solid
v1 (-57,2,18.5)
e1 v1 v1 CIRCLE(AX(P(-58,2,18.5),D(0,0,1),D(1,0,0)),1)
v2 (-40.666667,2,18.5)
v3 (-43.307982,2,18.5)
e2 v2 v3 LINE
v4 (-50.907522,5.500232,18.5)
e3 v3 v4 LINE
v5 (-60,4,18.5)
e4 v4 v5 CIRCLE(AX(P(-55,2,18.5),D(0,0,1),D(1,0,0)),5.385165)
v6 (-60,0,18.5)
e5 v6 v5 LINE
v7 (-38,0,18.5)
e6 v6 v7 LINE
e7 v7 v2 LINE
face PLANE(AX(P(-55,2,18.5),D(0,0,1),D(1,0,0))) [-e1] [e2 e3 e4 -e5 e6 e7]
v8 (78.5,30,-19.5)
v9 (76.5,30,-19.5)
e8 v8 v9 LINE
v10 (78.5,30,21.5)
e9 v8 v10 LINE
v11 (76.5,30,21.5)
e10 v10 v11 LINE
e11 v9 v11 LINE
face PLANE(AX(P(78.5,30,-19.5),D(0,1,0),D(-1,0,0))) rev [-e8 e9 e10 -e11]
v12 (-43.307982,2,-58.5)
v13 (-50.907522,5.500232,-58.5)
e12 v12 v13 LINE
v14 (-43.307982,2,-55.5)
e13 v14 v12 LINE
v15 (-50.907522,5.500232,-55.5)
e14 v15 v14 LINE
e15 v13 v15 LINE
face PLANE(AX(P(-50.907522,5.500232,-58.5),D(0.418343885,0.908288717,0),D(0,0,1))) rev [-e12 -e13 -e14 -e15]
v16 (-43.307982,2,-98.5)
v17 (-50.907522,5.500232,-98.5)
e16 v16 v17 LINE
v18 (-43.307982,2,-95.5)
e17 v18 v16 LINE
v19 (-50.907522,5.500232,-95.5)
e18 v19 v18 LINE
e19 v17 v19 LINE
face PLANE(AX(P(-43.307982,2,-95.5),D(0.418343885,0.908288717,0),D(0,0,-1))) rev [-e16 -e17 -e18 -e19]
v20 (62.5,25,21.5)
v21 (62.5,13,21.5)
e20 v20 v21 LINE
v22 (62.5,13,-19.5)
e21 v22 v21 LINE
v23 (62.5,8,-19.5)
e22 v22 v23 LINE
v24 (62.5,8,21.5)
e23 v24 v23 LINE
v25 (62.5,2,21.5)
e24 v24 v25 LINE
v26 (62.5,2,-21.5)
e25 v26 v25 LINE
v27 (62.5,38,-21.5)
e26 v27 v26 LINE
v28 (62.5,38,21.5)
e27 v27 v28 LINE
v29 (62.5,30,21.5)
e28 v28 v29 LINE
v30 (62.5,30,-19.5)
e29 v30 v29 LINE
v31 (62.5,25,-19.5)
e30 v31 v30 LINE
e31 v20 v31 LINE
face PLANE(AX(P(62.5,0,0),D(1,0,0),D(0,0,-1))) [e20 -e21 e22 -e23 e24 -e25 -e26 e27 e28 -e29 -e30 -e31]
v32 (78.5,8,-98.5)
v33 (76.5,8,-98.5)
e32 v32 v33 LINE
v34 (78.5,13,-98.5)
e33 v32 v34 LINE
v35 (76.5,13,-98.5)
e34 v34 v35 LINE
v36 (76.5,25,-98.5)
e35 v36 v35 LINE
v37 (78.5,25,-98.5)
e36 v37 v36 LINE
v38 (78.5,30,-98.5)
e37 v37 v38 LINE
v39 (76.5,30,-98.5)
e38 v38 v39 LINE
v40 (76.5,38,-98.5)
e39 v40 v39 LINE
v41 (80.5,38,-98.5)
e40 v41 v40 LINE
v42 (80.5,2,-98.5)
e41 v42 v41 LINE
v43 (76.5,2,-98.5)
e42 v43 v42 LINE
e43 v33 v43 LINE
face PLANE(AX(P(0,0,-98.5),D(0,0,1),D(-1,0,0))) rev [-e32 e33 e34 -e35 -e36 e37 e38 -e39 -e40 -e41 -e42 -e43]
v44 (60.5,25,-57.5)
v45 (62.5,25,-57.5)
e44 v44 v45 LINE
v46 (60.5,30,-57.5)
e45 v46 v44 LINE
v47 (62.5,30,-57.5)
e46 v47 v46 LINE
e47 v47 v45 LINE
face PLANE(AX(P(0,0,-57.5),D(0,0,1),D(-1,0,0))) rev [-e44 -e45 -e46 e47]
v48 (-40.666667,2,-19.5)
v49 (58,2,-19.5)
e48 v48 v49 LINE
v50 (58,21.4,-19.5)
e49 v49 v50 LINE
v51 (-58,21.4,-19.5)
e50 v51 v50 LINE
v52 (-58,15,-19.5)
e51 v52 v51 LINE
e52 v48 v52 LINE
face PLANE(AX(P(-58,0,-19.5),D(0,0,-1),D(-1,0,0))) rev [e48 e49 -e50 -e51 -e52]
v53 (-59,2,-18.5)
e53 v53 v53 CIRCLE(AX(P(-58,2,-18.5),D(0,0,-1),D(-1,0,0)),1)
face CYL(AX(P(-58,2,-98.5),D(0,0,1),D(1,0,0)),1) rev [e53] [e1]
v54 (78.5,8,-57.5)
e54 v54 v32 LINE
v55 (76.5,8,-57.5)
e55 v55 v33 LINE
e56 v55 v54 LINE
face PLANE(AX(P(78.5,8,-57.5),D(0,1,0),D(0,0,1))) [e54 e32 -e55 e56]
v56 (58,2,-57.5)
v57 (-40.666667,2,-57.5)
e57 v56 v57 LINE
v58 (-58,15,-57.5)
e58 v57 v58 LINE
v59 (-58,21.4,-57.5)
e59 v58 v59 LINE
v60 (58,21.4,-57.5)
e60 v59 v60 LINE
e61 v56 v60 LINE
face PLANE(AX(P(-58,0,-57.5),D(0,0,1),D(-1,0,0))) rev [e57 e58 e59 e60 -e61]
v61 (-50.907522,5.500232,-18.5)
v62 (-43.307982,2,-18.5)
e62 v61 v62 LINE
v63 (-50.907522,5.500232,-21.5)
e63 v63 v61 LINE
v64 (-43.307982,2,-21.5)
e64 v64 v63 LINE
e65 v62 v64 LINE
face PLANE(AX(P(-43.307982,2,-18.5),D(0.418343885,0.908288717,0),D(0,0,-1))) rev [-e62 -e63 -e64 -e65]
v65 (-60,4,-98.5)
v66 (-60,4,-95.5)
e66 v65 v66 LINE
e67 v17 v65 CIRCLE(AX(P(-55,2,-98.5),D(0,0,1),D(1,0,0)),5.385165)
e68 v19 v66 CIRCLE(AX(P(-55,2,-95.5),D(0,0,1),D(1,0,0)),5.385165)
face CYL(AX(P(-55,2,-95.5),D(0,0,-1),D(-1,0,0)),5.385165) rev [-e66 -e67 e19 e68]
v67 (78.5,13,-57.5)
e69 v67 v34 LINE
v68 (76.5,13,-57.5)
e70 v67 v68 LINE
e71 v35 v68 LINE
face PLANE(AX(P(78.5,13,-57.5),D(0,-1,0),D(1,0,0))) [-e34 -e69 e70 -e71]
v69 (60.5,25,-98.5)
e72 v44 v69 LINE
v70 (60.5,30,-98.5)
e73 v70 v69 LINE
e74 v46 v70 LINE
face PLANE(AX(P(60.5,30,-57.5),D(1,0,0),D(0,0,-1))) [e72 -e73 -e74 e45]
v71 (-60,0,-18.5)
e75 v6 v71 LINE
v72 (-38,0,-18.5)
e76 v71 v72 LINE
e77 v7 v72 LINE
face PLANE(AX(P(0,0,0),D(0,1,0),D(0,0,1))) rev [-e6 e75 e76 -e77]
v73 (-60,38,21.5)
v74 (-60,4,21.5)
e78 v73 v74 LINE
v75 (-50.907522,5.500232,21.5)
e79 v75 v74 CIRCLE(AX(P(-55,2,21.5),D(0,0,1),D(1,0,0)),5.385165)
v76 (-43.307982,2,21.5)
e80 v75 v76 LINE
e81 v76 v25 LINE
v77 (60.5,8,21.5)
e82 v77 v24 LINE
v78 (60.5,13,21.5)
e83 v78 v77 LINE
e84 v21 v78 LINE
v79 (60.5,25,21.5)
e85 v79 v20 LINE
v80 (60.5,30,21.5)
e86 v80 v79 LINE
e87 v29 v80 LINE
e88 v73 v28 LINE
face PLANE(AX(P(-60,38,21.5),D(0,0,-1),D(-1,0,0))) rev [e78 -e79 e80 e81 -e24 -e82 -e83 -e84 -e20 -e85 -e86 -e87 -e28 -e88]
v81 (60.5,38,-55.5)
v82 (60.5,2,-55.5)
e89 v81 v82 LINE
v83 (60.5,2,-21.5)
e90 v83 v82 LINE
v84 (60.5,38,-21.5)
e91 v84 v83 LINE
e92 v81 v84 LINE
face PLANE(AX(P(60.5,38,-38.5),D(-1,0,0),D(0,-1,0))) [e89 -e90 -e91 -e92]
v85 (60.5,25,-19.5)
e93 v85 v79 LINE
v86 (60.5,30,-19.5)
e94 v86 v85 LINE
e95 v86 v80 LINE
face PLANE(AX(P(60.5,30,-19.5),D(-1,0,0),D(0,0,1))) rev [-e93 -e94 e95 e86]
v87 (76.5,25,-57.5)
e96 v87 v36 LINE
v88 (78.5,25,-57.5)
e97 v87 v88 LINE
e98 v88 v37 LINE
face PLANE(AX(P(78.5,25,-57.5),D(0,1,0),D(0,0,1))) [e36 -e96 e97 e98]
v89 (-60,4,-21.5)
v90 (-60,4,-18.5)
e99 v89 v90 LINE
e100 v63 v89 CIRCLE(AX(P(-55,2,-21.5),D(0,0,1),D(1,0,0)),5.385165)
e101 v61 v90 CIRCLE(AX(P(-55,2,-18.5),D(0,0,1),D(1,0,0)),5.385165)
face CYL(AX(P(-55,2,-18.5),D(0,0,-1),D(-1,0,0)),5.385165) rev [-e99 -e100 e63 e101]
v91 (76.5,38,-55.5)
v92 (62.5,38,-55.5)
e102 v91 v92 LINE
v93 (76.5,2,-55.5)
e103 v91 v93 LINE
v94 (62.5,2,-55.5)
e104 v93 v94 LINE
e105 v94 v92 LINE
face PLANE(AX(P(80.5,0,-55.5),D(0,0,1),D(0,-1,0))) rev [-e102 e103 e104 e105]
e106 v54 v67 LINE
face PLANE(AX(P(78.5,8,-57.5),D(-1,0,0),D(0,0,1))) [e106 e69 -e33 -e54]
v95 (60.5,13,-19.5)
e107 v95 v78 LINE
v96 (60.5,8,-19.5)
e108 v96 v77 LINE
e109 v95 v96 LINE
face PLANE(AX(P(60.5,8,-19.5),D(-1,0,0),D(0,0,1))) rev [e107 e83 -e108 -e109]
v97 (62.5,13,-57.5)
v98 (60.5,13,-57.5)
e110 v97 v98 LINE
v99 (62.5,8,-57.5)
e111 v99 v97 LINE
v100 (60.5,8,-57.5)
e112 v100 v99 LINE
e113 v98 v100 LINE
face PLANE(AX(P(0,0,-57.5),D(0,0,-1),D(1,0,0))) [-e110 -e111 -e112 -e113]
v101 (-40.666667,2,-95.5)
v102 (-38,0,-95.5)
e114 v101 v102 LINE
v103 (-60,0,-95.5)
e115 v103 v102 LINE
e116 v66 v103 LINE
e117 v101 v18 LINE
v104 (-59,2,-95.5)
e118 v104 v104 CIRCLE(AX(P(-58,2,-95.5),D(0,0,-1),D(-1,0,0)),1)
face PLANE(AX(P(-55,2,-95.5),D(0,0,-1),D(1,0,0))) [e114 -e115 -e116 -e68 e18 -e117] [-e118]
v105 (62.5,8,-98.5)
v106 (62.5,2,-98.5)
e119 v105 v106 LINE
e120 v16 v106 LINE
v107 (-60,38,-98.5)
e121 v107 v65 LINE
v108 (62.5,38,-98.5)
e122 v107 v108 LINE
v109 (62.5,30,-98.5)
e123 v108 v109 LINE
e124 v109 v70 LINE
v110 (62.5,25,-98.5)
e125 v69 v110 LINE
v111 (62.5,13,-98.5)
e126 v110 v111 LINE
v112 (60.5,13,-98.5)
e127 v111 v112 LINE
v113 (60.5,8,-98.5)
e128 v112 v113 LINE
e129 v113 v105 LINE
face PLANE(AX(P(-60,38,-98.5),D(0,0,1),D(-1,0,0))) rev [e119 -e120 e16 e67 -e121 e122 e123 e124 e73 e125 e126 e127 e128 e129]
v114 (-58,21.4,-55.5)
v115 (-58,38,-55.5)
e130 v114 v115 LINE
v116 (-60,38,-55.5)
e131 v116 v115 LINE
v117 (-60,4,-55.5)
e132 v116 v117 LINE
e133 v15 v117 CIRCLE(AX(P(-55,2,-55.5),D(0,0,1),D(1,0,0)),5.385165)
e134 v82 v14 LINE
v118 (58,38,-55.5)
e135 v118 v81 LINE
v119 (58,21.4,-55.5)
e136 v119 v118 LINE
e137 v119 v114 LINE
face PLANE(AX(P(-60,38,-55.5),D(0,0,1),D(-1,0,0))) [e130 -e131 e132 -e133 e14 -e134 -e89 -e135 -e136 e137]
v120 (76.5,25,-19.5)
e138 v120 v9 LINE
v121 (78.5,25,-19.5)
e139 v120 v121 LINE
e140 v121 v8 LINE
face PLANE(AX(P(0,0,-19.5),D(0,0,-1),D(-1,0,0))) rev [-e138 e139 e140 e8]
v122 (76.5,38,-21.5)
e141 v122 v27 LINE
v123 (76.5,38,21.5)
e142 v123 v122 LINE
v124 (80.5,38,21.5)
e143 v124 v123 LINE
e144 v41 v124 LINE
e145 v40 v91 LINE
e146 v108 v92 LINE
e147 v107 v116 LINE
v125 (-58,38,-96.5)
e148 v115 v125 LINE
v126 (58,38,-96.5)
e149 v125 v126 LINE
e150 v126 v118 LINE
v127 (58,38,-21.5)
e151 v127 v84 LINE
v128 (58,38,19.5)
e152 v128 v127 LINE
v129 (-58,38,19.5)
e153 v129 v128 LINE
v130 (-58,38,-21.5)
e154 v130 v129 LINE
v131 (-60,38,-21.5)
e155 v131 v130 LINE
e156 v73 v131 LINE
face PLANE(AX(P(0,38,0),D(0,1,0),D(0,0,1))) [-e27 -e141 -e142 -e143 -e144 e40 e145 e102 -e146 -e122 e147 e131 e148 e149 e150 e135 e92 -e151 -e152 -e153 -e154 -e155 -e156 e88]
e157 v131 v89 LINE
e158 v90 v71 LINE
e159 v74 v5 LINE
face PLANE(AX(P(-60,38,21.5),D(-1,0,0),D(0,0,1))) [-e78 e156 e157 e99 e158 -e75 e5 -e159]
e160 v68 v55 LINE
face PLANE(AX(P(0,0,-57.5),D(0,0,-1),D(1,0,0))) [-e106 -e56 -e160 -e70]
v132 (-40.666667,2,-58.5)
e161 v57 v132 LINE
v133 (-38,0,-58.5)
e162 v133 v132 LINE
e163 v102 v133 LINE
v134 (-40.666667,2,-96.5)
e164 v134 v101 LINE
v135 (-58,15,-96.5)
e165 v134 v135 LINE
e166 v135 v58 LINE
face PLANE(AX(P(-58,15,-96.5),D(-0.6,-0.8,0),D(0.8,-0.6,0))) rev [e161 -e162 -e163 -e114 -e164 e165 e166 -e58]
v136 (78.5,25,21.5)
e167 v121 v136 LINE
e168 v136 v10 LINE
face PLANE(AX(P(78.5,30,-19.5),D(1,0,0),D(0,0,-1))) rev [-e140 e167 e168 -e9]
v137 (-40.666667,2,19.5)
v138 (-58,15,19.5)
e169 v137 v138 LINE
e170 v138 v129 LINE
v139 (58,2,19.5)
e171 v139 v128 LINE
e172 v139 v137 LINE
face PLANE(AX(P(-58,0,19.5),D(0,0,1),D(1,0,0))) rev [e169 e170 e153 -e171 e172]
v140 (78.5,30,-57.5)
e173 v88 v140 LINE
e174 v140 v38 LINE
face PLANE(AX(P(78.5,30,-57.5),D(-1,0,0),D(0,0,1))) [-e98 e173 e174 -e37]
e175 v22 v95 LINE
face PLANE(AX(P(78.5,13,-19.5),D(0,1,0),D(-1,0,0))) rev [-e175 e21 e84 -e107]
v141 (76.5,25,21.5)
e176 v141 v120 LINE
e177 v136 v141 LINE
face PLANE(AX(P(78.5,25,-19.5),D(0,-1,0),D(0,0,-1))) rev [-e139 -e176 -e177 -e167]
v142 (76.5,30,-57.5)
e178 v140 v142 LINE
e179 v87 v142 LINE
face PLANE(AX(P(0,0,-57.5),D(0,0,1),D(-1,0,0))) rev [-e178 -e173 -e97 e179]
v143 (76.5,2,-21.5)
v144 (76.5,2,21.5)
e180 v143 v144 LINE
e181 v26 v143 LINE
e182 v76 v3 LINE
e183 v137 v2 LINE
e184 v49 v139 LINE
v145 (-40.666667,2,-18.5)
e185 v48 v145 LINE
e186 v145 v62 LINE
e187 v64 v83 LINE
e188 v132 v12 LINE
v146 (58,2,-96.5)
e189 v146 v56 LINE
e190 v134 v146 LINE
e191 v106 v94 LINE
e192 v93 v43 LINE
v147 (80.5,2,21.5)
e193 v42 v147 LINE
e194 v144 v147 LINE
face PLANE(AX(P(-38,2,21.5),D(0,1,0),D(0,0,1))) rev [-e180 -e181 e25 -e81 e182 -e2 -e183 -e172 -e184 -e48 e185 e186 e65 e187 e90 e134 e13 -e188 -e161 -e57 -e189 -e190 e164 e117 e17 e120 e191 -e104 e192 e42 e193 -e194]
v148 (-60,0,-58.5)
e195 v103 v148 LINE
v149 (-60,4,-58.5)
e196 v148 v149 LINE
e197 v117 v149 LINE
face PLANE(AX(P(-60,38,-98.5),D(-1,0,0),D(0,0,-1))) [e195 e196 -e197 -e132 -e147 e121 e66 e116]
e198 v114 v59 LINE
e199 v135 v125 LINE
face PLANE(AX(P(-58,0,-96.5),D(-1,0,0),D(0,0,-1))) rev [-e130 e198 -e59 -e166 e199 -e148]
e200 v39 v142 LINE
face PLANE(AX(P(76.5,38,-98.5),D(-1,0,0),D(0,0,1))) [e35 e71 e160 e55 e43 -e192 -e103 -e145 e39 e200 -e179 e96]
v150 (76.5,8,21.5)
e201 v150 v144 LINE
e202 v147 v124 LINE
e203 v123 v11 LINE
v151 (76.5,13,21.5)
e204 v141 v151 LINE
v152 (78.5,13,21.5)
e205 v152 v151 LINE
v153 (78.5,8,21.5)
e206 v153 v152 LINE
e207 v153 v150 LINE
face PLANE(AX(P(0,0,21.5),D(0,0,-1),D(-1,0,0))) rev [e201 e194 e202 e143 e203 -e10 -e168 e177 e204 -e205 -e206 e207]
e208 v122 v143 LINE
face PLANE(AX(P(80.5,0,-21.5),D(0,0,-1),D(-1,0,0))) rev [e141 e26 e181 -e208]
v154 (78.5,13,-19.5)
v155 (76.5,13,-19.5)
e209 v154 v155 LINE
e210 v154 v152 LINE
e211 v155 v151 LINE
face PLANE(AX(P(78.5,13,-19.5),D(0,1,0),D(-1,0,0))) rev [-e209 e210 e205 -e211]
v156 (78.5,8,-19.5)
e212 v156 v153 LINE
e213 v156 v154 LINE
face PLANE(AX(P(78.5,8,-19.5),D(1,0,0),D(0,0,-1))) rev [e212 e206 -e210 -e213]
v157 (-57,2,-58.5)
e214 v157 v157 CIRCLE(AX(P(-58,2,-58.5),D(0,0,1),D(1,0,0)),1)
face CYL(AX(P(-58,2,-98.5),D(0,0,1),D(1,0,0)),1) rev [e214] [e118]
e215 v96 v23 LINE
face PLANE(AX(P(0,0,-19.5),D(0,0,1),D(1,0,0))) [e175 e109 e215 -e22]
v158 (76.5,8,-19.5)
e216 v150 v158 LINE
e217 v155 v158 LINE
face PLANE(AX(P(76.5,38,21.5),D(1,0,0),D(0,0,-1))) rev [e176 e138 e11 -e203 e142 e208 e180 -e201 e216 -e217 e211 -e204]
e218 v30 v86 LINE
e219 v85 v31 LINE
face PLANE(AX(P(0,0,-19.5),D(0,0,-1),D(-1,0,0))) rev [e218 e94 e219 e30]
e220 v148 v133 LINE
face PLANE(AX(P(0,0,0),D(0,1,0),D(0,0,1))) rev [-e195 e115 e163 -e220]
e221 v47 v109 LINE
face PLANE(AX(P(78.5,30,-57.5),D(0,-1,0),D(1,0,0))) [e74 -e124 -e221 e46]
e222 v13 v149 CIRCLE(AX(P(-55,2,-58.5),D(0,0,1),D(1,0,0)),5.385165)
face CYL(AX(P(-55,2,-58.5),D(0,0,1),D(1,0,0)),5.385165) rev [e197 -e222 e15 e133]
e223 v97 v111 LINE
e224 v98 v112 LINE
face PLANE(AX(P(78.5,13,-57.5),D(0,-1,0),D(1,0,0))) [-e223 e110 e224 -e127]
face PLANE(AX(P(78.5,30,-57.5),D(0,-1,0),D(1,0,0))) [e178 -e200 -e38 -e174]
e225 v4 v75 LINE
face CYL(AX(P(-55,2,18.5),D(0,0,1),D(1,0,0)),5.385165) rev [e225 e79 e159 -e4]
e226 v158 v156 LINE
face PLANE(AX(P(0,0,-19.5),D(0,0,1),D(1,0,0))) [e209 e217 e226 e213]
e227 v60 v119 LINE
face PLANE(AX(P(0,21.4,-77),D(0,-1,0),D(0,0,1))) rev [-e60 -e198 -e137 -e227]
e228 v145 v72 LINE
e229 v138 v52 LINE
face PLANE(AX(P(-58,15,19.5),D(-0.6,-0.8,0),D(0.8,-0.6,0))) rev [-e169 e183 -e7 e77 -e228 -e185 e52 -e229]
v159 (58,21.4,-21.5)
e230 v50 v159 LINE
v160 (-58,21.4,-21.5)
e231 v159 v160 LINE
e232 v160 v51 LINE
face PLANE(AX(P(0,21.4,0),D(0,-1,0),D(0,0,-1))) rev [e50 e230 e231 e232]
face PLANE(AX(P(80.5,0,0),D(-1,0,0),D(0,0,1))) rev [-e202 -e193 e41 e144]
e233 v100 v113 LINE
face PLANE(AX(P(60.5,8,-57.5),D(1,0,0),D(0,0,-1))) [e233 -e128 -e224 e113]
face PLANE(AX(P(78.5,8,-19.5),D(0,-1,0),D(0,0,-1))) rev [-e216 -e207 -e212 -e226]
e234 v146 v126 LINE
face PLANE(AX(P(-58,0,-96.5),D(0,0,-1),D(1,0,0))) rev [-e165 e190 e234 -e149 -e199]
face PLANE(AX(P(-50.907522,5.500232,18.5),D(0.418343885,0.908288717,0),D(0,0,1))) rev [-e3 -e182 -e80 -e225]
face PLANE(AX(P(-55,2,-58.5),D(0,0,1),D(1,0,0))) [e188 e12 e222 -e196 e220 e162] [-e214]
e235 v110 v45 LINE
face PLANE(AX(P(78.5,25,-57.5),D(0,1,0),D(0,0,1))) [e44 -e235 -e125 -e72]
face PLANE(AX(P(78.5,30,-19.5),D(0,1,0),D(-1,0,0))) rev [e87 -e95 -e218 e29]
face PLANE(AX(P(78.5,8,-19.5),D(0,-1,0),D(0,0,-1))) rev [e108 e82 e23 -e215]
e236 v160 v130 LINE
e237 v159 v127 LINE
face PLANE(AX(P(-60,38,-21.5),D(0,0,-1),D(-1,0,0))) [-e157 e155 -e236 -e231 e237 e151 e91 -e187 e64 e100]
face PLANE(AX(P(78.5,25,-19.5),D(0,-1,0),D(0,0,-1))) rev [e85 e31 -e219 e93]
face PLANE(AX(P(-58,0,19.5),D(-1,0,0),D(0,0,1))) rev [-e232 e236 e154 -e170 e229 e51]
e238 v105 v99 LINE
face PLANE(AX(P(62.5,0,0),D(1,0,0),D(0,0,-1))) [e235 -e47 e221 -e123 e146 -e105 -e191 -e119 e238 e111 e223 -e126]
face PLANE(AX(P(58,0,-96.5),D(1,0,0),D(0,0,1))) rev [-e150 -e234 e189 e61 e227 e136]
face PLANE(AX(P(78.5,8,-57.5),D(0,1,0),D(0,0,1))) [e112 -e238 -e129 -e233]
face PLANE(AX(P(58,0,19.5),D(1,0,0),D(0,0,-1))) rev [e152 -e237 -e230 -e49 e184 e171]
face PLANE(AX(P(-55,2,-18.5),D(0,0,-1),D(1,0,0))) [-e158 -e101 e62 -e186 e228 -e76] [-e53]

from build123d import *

# Parameters (mm, degrees)
SKETCH2_W            = 120
SKETCH2_H            = 43
BOSS_EXTRUDE1_DEPTH  = 38
SKETCH3_W            = 116
SKETCH3_H            = 39
CUT_EXTRUDE1_DEPTH   = 38
BOSS_EXTRUDE2_DEPTH  = 39
SKETCH5_W            = 43
SKETCH5_H            = 38
BOSS_EXTRUDE3_DEPTH  = 2.5
SKETCH6_W            = 2
SKETCH6_H            = 38
BOSS_EXTRUDE4_DEPTH  = 17
SKETCH7_W            = 34
SKETCH7_H            = 38
BOSS_EXTRUDE5_DEPTH  = 18
SKETCH8_W            = 4
SKETCH8_H            = 38
BOSS_EXTRUDE6_DEPTH  = 43
SKETCH9_W            = 18
SKETCH9_H            = 5
CUT_EXTRUDE2_DEPTH   = 41
SKETCH11_W           = 120
SKETCH11_H           = 2
CUT_EXTRUDE3_DEPTH   = 118.5
CUT_EXTRUDE4_DEPTH   = 3
MIRROR4_COPY_1_DEPTH = 3
CUT_EXTRUDE5_START   = -114
SKETCH13_R           = 1
CUT_EXTRUDE5_DEPTH   = 114
SKETCH14_W           = 116
SKETCH14_H           = 2
CUT_EXTRUDE6_DEPTH   = 16.6


with BuildPart() as part:
    # Sketch2 → Boss-Extrude1 (new body)
    with BuildSketch(Plane(origin=(0, 0, 0), x_dir=(1, 0, 0), z_dir=(0, 1, 0))):
        Rectangle(SKETCH2_W, SKETCH2_H)
    extrude(amount=BOSS_EXTRUDE1_DEPTH)

    # Sketch3 → Cut-Extrude1 (cut)
    with BuildSketch(Plane(origin=(0, 38, 0), x_dir=(1, 0, 0), z_dir=(0, 1, 0))):
        Rectangle(SKETCH3_W, SKETCH3_H)
    extrude(amount=-CUT_EXTRUDE1_DEPTH, mode=Mode.SUBTRACT)

    # Sketch4 → Boss-Extrude2 (add)
    with BuildSketch(Plane.XY.offset(-19.5)):
        Polygon((-58, 0), (-58, 15), (-38, 0), align=None)
    extrude(amount=BOSS_EXTRUDE2_DEPTH)

    # Sketch5 → Boss-Extrude3 (add)
    with BuildSketch(Plane(origin=(60, 0, 0), x_dir=(0, 0, -1), z_dir=(1, 0, 0))):
        with Locations((0, 19)):
            Rectangle(SKETCH5_W, SKETCH5_H)
    extrude(amount=BOSS_EXTRUDE3_DEPTH)

    # Sketch6 → Boss-Extrude4 (add)
    with BuildSketch(Plane(origin=(0, 0, -21.5), x_dir=(-1, 0, 0), z_dir=(0, 0, -1))):
        with Locations((-61.5, 19)):
            Rectangle(SKETCH6_W, SKETCH6_H)
    extrude(amount=BOSS_EXTRUDE4_DEPTH)

    # Mirror1: part across plane


with BuildPart() as part_1:
    add(part.part)
    add(part.part.mirror(Plane(origin=(0, 0, -38.5), x_dir=(1, 0, 0), z_dir=(0, 0, -1))))

    # Sketch7 → Boss-Extrude5 (add)
    with BuildSketch(Plane(origin=(62.5, 0, 0), x_dir=(0, 0, -1), z_dir=(1, 0, 0))):
        with Locations((38.5, 19)):
            Rectangle(SKETCH7_W, SKETCH7_H)
    extrude(amount=BOSS_EXTRUDE5_DEPTH)

    # Sketch8 → Boss-Extrude6 (add)
    with BuildSketch(Plane.XY.offset(-21.5)):
        with Locations((78.5, 19)):
            Rectangle(SKETCH8_W, SKETCH8_H)
    boss_extrude6 = extrude(amount=BOSS_EXTRUDE6_DEPTH)

    # Sketch9 → Cut-Extrude2 (cut)
    with BuildSketch(Plane.XY.offset(21.5)):
        with Locations((69.5, 27.5)):
            Rectangle(SKETCH9_W, SKETCH9_H)
        with Locations((69.5, 10.5)):
            Rectangle(SKETCH9_W, SKETCH9_H)
    cut_extrude2 = extrude(amount=-CUT_EXTRUDE2_DEPTH, mode=Mode.SUBTRACT)

    # Mirror2: Boss-Extrude6, Cut-Extrude2 across plane
    add(boss_extrude6.mirror(Plane(origin=(0, 0, -38.5), x_dir=(1, 0, 0), z_dir=(0, 0, -1))))
    add(cut_extrude2.mirror(Plane(origin=(0, 0, -38.5), x_dir=(1, 0, 0), z_dir=(0, 0, -1))), mode=Mode.SUBTRACT)

    # Sketch11 → Cut-Extrude3 (cut)
    with BuildSketch(Plane(origin=(80.5, 0, 0), x_dir=(0, 0, -1), z_dir=(1, 0, 0))):
        with Locations((38.5, 1)):
            Rectangle(SKETCH11_W, SKETCH11_H)
    extrude(amount=-CUT_EXTRUDE3_DEPTH, mode=Mode.SUBTRACT)

    # Sketch12 → Cut-Extrude4 (cut)
    with BuildSketch(Plane.XY.offset(21.5)):
        with BuildLine():
            Line((-38, 2), (-49.614835193, 2))
            ThreePointArc((-49.614835193, 2), (-56.018375168, 7.287996976), (-60, 0))
            Line((-60, 0), (-38, 0))
            Line((-38, 0), (-38, 2))
        make_face()
    cut_extrude4 = extrude(amount=-CUT_EXTRUDE4_DEPTH, mode=Mode.SUBTRACT)

    # Mirror3: Cut-Extrude4 across plane
    add(cut_extrude4.mirror(Plane.XY), mode=Mode.SUBTRACT)

    # Mirror4: Cut-Extrude4 across plane
    add(cut_extrude4.mirror(Plane(origin=(0, 0, -38.5), x_dir=(1, 0, 0), z_dir=(0, 0, -1))), mode=Mode.SUBTRACT)

    # Mirror4 copy 1 sketch → Mirror4 copy 1 (cut)
    with BuildSketch(Plane.XY.offset(-55.5)):
        with BuildLine():
            Line((-38, 2), (-49.614835193, 2))
            ThreePointArc((-49.614835193, 2), (-56.018375168, 7.287996976), (-60, 0))
            Line((-60, 0), (-38, 0))
            Line((-38, 0), (-38, 2))
        make_face()
    extrude(amount=-MIRROR4_COPY_1_DEPTH, mode=Mode.SUBTRACT)

    # Sketch13 → Cut-Extrude5 (cut)
    with BuildSketch(Plane.XY.offset(18.5).offset(CUT_EXTRUDE5_START)):
        with Locations((-58, 2)):
            Circle(SKETCH13_R)
    extrude(amount=CUT_EXTRUDE5_DEPTH, mode=Mode.SUBTRACT)

    # Chamfer1
    # the kernel refuses this chamfer: 10 mm, written as the material it takes off along each edge
    with BuildSketch(Plane(origin=(-49.614835193, 2, 38.180669666), x_dir=(-0.41152080336556635, 0.9114003666870882, 0), z_dir=(0, 0, -1))) as chamfer1_piece_1:
        with BuildLine():
            Line((4.024103798, 0), (-2.897424879, 6.010331734))
            Line((-2.897424879, 6.010331734), (-3.079704953, 5.928027573))
            ThreePointArc((-3.079704953, 5.928027573), (-1.554736759, 2.957293148), (-0.182280073, -0.082304161))
            Line((-0.182280073, -0.082304161), (0.082304161, -0.182280073))
            ThreePointArc((0.082304161, -0.182280073), (2.000716354, 0.27264804), (3.968173362, -0.192020276))
            Line((3.968173362, -0.192020276), (4.024103798, 0))
        make_face()
    extrude(amount=19.680669666, mode=Mode.SUBTRACT)

    # Chamfer2
    # the kernel refuses this chamfer: 10 mm, written as the material it takes off along each edge
    with BuildSketch(Plane(origin=(-49.614835193, 2, -38.180669666), x_dir=(0.9996854583228201, -0.0250795617564035, 0), z_dir=(0, 0, 1))) as chamfer2_piece_1:
        with BuildLine():
            Line((6.672267866, 0), (-1.747462586, 3.624884258))
            Line((-1.747462586, 3.624884258), (-1.896145364, 3.491117927))
            ThreePointArc((-1.896145364, 3.491117927), (-0.623209418, 1.920628258), (-0.199937092, -0.005015912))
            Line((-0.199937092, -0.005015912), (0.005015912, -0.199937092))
            ThreePointArc((0.005015912, -0.199937092), (3.339051469, -0.116294632), (6.677283779, -0.199937092))
            Line((6.677283779, -0.199937092), (6.672267866, 0))
        make_face()
    extrude(amount=19.680669666, mode=Mode.SUBTRACT)

    # Chamfer3
    # the kernel refuses this chamfer: 10 mm, written as the material it takes off along each edge
    with BuildSketch(Plane(origin=(-49.614835193, 2, -38.819330334), x_dir=(0.9996854583228201, -0.02507956175640344, 0), z_dir=(0, 0, -1))) as chamfer3_piece_1:
        with BuildLine():
            Line((6.672267866, 0), (-1.747462586, -3.624884258))
            Line((-1.747462586, -3.624884258), (-1.896145364, -3.491117927))
            ThreePointArc((-1.896145364, -3.491117927), (-0.623209418, -1.920628258), (-0.199937092, 0.005015912))
            Line((-0.199937092, 0.005015912), (0.005015912, 0.199937092))
            ThreePointArc((0.005015912, 0.199937092), (3.339051469, 0.116294632), (6.677283779, 0.199937092))
            Line((6.677283779, 0.199937092), (6.672267866, 0))
        make_face()
    extrude(amount=19.680669666, mode=Mode.SUBTRACT)

    # Chamfer4
    # the kernel refuses this chamfer: 10 mm, written as the material it takes off along each edge
    with BuildSketch(Plane(origin=(-49.614835193, 2, -115.180669666), x_dir=(0.9996854583228201, -0.0250795617564035, 0), z_dir=(0, 0, 1))) as chamfer4_piece_1:
        with BuildLine():
            Line((6.672267866, 0), (-1.747462586, 3.624884258))
            Line((-1.747462586, 3.624884258), (-1.896145364, 3.491117927))
            ThreePointArc((-1.896145364, 3.491117927), (-0.623209418, 1.920628258), (-0.199937092, -0.005015912))
            Line((-0.199937092, -0.005015912), (0.005015912, -0.199937092))
            ThreePointArc((0.005015912, -0.199937092), (3.339051469, -0.116294632), (6.677283779, -0.199937092))
            Line((6.677283779, -0.199937092), (6.672267866, 0))
        make_face()
    extrude(amount=19.680669666, mode=Mode.SUBTRACT)

    # Sketch14 → Cut-Extrude6 (cut)
    with BuildSketch(Plane(origin=(0, 38, 0), x_dir=(1, 0, 0), z_dir=(0, 1, 0))):
        with Locations((0, 20.5)):
            Rectangle(SKETCH14_W, SKETCH14_H)
    cut_extrude6 = extrude(amount=-CUT_EXTRUDE6_DEPTH, mode=Mode.SUBTRACT)

    # Mirror5: Cut-Extrude6 across plane
    add(cut_extrude6.mirror(Plane(origin=(0, 0, -38.5), x_dir=(1, 0, 0), z_dir=(0, 0, -1))), mode=Mode.SUBTRACT)


solid = part_1.part
